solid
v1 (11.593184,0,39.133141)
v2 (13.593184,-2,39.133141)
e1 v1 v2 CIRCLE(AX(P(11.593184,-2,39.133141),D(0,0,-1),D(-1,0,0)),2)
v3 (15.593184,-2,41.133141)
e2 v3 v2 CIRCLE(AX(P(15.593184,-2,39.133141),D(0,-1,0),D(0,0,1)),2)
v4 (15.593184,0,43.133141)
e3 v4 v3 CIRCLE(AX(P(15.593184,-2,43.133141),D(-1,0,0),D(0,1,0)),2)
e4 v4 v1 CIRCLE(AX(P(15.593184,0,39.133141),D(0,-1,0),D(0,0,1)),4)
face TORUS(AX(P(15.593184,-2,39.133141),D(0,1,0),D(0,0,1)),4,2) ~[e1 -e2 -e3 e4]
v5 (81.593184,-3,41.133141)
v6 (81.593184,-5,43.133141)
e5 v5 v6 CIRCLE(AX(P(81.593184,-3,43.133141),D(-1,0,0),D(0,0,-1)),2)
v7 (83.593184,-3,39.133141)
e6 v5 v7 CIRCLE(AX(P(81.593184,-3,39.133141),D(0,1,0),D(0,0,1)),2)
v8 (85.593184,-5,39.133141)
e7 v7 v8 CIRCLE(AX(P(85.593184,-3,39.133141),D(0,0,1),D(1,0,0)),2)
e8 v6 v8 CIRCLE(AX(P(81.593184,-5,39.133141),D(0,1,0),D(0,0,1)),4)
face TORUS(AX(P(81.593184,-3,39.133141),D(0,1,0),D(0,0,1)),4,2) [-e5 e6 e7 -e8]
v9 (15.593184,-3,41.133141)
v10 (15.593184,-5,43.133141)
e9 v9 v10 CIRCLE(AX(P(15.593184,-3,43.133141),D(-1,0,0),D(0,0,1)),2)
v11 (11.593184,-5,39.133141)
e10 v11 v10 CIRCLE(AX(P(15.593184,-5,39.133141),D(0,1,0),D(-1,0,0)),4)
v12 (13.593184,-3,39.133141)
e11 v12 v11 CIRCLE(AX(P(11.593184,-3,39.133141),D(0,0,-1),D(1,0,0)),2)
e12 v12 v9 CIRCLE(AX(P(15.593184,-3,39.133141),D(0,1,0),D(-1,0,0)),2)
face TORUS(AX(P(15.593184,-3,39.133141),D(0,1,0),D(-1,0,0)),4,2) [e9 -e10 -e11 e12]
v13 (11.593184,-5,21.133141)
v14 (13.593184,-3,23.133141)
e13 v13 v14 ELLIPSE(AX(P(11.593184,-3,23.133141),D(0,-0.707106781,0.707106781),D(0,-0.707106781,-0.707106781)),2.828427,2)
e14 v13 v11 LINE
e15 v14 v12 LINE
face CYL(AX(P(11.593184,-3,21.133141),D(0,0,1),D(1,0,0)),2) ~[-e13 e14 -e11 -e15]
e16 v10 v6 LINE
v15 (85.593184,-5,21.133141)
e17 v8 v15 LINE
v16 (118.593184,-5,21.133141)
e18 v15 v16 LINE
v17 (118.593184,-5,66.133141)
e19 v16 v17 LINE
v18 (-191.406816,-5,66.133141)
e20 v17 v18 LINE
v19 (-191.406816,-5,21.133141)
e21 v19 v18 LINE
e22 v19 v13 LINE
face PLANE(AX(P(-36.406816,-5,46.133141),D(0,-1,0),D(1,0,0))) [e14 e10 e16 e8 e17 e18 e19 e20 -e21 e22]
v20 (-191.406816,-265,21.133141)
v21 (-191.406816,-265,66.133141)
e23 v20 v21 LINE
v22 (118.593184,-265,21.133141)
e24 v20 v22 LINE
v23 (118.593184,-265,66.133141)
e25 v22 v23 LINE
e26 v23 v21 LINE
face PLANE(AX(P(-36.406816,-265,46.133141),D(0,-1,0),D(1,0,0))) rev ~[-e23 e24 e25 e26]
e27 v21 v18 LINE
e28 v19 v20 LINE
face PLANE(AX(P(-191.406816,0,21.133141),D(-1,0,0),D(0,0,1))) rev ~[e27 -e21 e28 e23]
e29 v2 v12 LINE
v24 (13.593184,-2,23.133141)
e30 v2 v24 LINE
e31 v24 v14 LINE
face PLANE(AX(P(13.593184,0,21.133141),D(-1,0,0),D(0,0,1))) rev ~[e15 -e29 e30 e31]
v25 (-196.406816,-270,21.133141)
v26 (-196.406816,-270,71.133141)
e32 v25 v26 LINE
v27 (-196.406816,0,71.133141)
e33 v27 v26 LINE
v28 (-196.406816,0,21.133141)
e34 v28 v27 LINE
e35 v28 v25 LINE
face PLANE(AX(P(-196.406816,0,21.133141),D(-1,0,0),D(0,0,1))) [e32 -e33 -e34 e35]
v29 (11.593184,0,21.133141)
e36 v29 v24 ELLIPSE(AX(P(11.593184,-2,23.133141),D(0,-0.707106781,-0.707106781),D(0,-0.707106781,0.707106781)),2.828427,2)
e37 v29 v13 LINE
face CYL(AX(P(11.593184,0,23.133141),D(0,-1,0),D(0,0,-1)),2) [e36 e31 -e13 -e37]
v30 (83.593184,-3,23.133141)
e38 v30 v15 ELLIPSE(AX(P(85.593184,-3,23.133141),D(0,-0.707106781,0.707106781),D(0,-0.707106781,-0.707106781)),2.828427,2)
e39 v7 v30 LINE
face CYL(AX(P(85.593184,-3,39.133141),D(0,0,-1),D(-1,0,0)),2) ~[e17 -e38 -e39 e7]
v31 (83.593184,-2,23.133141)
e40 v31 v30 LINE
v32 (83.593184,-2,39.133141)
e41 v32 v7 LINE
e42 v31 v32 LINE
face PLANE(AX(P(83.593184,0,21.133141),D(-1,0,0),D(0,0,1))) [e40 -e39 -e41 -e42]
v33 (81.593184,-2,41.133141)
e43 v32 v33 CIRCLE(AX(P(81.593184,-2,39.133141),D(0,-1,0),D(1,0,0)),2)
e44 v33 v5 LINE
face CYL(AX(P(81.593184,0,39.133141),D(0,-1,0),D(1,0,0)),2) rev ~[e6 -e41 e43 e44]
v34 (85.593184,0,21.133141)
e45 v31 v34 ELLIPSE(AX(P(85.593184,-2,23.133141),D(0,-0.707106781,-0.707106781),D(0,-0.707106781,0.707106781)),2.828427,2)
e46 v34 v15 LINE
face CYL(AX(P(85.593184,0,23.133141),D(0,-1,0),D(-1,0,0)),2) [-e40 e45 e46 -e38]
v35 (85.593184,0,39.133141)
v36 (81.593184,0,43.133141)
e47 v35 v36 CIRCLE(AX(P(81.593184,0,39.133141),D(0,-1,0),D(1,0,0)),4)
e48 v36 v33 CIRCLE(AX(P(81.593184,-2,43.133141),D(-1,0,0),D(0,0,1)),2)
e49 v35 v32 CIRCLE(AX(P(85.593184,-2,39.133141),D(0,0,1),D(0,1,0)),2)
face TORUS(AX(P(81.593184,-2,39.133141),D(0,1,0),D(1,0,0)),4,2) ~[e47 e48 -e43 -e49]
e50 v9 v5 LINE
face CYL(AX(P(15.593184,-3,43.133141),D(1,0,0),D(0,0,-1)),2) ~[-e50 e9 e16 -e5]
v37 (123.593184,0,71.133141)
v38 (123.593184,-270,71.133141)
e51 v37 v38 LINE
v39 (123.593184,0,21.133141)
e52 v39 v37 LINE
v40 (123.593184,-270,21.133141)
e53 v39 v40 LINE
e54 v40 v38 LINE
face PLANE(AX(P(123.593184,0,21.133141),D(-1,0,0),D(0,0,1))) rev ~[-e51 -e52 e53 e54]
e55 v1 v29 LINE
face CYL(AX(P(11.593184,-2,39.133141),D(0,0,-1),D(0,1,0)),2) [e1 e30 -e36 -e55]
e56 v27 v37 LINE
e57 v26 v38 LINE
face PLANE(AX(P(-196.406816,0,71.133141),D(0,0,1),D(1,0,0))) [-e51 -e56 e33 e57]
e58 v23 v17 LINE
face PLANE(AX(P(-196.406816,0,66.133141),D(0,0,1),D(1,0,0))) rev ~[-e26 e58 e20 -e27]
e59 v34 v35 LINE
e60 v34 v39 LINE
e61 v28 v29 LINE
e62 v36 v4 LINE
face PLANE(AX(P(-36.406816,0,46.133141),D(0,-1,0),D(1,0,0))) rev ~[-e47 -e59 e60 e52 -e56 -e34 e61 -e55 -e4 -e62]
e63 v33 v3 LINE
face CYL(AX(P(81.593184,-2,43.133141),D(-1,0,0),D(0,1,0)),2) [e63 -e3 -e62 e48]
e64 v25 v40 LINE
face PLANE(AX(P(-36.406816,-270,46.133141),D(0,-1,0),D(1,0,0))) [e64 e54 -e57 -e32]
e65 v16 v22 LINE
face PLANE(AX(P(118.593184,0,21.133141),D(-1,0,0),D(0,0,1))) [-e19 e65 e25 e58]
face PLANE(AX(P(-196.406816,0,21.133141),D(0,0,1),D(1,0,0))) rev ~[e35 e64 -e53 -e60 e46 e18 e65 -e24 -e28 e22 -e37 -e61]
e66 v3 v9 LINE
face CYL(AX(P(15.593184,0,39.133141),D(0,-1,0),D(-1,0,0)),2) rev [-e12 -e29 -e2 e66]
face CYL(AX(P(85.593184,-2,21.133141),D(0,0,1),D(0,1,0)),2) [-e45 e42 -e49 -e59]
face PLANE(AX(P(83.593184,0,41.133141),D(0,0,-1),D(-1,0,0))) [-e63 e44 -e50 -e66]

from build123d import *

# Parameters (mm, degrees)
F0_W     = 320
F0_H     = 50
F1_DEPTH = 270
F2_T     = -5
F3_W     = 70
F3_H     = 20
F4_DEPTH = 25
F5_F1_R  = 2
F5_F2_R  = 2


with BuildPart() as f1:
    # F0 (on Front) → F1 (new body)
    with BuildSketch(Plane.XZ):
        with Locations((-36.4068159834, 46.1331414707)):
            Rectangle(F0_W, F0_H)
    extrude(amount=F1_DEPTH)

    # F2
    f2_openings = [f1.faces().sort_by_distance(p)[0] for p in [
        (-36.406816, -135, 21.133141),
    ]]
    offset(amount=F2_T, openings=f2_openings)

    # F3 (on face) → F4 (cut)
    with BuildSketch(Plane(origin=(0, 0, 0), x_dir=(-1, 0, 0), z_dir=(0, 1, 0))):
        with Locations((-48.5931840166, 31.1331414707)):
            Rectangle(F3_W, F3_H)
    extrude(amount=-F4_DEPTH, mode=Mode.SUBTRACT)

    # F5: fillet of radius 2 on 6 edges, made by hand

    # F5_f1
    f5_f1_edges = [f1.edges().sort_by_distance(p)[0] for p in [
        (83.5931840166, -2.5, 41.1331414707),
        (13.5931840166, -2.5, 41.1331414707),
    ]]
    fillet(f5_f1_edges, radius=F5_F1_R)

    # F5_f2
    f5_f2_edges = [f1.edges().sort_by_distance(p)[0] for p in [
        (83.5931840166, -2.5, 21.1331414707),
        (13.5931840166, -2.5, 21.1331414707),
        (48.5931840166, 0, 41.1331414707),
        (48.5931840166, -5, 41.1331414707),
        (83.007397579, -5, 40.5473550331),
        (14.1789704543, -5, 40.5473550331),
        (14.1789704543, 0, 40.5473550331),
        (83.007397579, 0, 40.5473550331),
    ]]
    fillet(f5_f2_edges, radius=F5_F2_R)


solid = f1.part
